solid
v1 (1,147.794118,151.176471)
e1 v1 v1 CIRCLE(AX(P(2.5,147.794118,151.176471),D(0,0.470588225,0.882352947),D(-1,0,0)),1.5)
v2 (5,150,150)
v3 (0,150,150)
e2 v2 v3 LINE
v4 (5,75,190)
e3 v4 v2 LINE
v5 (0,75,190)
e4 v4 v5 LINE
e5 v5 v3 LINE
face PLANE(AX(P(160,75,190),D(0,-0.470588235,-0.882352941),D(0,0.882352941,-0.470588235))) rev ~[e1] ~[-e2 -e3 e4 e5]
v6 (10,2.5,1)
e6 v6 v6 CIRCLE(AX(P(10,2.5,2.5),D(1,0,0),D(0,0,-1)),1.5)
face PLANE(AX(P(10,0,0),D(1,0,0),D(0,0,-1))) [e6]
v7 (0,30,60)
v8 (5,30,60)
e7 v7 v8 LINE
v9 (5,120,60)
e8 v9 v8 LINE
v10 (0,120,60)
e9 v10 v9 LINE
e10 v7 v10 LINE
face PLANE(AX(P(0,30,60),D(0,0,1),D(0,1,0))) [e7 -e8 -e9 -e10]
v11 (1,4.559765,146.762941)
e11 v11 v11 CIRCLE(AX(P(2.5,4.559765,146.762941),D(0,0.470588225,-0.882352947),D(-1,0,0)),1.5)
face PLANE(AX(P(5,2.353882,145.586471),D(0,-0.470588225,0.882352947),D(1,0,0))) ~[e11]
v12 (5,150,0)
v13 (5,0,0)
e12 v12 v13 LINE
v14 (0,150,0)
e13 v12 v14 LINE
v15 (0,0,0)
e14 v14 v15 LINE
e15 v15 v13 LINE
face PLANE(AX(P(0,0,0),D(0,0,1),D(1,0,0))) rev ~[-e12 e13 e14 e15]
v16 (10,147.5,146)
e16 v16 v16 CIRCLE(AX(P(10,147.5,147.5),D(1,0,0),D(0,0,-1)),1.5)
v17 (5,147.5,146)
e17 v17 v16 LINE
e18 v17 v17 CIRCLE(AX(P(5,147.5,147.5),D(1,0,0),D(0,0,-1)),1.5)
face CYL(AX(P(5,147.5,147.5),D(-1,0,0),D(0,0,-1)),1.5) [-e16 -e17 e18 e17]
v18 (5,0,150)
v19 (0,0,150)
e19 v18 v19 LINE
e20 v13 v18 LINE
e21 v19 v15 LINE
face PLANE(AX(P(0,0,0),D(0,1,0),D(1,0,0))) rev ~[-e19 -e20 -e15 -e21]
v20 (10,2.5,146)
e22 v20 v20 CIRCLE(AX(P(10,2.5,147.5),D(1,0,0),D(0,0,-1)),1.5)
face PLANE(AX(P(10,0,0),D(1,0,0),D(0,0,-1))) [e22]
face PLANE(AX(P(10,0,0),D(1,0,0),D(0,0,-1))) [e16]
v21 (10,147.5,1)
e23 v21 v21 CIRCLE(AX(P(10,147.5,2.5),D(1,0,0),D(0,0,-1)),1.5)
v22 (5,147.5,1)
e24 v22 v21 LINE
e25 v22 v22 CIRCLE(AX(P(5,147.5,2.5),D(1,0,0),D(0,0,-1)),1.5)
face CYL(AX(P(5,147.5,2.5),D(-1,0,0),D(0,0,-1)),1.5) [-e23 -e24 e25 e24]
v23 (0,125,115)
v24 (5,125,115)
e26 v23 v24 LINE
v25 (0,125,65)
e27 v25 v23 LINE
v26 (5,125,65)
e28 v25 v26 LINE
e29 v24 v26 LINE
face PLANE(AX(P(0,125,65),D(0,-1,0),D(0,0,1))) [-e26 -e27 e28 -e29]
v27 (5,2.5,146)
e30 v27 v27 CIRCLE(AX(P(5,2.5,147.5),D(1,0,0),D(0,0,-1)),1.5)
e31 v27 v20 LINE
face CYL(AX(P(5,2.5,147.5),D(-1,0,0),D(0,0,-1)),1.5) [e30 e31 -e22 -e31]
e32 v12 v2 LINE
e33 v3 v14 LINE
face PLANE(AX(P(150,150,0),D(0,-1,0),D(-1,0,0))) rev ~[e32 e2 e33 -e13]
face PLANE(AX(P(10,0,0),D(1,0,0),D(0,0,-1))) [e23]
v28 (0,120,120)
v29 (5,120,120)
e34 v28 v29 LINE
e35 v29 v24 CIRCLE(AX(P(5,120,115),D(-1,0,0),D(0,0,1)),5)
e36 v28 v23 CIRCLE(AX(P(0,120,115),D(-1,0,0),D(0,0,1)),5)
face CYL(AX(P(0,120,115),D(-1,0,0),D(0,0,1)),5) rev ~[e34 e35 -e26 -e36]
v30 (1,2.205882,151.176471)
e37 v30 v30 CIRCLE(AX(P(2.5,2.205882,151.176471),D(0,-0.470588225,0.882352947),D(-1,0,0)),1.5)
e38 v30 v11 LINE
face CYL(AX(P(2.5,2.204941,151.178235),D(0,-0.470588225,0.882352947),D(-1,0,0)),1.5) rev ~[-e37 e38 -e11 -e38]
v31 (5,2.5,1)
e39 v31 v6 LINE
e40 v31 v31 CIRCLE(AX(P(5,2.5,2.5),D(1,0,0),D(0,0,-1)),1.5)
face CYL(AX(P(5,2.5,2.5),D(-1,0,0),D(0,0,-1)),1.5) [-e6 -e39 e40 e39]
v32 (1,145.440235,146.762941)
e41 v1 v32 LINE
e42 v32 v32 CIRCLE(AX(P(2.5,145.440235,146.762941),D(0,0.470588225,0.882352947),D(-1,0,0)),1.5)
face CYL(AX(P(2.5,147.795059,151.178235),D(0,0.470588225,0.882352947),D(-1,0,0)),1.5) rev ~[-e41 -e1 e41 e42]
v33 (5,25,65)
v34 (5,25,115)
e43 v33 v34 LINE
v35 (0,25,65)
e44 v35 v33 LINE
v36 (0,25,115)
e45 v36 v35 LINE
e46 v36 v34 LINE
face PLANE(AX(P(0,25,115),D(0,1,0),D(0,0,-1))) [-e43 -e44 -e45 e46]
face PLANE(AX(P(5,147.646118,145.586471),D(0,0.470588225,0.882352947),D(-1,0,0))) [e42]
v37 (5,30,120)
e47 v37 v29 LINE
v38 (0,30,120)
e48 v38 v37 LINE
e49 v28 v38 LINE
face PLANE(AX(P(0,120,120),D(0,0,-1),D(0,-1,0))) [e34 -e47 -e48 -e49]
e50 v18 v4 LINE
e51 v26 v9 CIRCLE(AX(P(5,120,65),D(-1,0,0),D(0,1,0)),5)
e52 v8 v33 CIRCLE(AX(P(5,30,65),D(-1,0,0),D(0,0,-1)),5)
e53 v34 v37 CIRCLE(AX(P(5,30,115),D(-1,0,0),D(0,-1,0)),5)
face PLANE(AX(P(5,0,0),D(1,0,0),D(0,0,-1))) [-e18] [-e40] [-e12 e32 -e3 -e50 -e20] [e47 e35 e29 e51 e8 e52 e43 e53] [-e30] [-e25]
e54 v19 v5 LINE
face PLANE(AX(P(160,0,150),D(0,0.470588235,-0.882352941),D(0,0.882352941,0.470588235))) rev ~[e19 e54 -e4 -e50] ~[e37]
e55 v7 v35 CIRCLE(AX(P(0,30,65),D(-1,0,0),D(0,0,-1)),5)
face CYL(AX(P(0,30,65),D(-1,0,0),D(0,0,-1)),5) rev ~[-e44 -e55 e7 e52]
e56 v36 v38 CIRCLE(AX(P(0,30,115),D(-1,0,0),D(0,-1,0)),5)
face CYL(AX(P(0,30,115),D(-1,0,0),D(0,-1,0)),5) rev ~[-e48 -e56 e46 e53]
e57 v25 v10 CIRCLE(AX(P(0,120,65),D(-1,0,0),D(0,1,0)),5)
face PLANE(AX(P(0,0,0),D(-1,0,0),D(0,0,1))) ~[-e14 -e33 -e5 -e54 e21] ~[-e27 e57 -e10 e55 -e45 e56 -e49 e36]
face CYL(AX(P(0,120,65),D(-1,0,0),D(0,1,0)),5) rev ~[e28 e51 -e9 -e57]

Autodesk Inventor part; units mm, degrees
sketch "Boceto1" plane through (0, 0, 0) normal (0, 0, 1) x (1, 0, 0)
  line L0 (0, 0) -> (150, 0)
  line L1 (150, 0) -> (150, 150)
  line L2 (150, 150) -> (0, 150)
  line L3 (0, 150) -> (0, 0)
  line L4 (5, 145) -> (145, 145)
  line L5 (145, 145) -> (145, 5)
  line L6 (145, 5) -> (5, 5)
  line L7 (5, 5) -> (5, 145)
  dimension "d0" = 150
  dimension "d1" = 150
  dimension "d2" = 5
extrude "Extrusión1" add sketch "Boceto1" along normal blind 150
sketch "Boceto2" plane through (150, 0, 0) normal (1, 0, 0) x (0, 0, -1)
  line L0 (-150, 0) -> (-150, 150) projected
  line L1 (-150, 75) -> (-190, 75) construction
  line L2 (-190, 75) -> (-150, 150)
  line L3 (0, 0) -> (-150, 0) construction
  line L4 (-150, 0) -> (-190, 75)
  dimension "d5" = 40
extrude "Extrusión2" add sketch "Boceto2" against normal blind 5
ref_plane "Plano de trabajo1" through (75, 0, 0) normal (1, 0, 0) x (0, 0, -1)
mirror "Simetría1" about plane through (75, 0, 0) normal (1, 0, 0) of "Extrusión2"
sketch "Boceto3" plane through (0, 150, 0) normal (0, 1, 0) x (1, 0, 0)
  line L0 (105, -60) -> (45, -60)
  line L1 (45, -60) -> (45, -95)
  line L2 (60, -110) -> (90, -110)
  line L3 (105, -95) -> (105, -60)
  line L4 (150, 0) -> (0, 0) projected
  line L5 (145, -150) -> (5, -150) projected
  arc A0 (90, -110) -> (105, -95) centre (90, -95) ccw
  arc A1 (45, -95) -> (60, -110) centre (60, -95) ccw
  point P0 (45, -110)
  point P1 (105, -110)
  point P2 (75, -60)
  point P3 (75, 0)
  dimension "d8" = 60
  dimension "d9" = 50
  dimension "d10" = 40
  dimension "d11" = 15
extrude "Extrusión3" cut sketch "Boceto3" against normal through all
sketch "Boceto4" plane through (150, 0, 0) normal (1, 0, 0) x (0, 0, -1)
  line L0 (-13, 20) -> (-123, 20)
  line L1 (-128, 25) -> (-128, 75)
  line L2 (-123, 80) -> (-13, 80)
  line L3 (-8, 75) -> (-8, 25)
  line L4 (0, 0) -> (0, 150) projected
  line L5 (0, 0) -> (-150, 0) projected
  arc A0 (-123, 80) -> (-128, 75) centre (-123, 75) ccw
  arc A1 (-8, 75) -> (-13, 80) centre (-13, 75) ccw
  arc A2 (-13, 20) -> (-8, 25) centre (-13, 25) ccw
  arc A3 (-128, 25) -> (-123, 20) centre (-123, 25) ccw
  point P0 (-128, 80)
  point P1 (-128, 20)
  point P2 (-8, 80)
  dimension "d14" = 120
  dimension "d15" = 60
  dimension "d16" = 8
  dimension "d17" = 20
  dimension "d18" = 5
extrude "Extrusión4" cut sketch "Boceto4" against normal up to surface (5 mm away)
sketch "Boceto5" plane through (0, 0, 0) normal (-1, 0, 0) x (0, 0, 1)
  line L0 (65, 125) -> (115, 125)
  line L1 (120, 120) -> (120, 30)
  line L2 (115, 25) -> (65, 25)
  line L3 (60, 30) -> (60, 120)
  line L4 (0, 150) -> (0, 0) projected
  arc A0 (120, 120) -> (115, 125) centre (115, 120) ccw
  arc A1 (115, 25) -> (120, 30) centre (115, 30) ccw
  arc A2 (65, 125) -> (60, 120) centre (65, 120) ccw
  arc A3 (60, 30) -> (65, 25) centre (65, 30) ccw
  point P0 (60, 150)
  point P1 (120, 25)
  point P2 (120, 125)
  point P3 (60, 25)
  point P4 (60, 75)
  point P5 (0, 75)
  dimension "d21" = 60
  dimension "d22" = 100
  dimension "d23" = 60
  dimension "d24" = 5
extrude "Extrusión5" cut sketch "Boceto5" against normal blind 10
sketch "Boceto6" plane through (150, 0, 0) normal (1, 0, 0) x (0, 0, -1)
  line L0 (-190, 75) -> (-150, 0) projected
  line L1 (-150, 150) -> (-190, 75) projected
  line L2 (-154.4118, 152.3529) -> (-195.6667, 75)
  line L3 (-195.6667, 75) -> (-154.4118, -2.3529)
  line L4 (-154.4118, 152.3529) -> (-144.4118, 152.3529)
  line L5 (-144.4118, 152.3529) -> (-144.4118, 150)
  line L6 (-154.4118, -2.3529) -> (-144.4118, -2.3529)
  line L7 (-144.4118, -2.3529) -> (-144.4118, 0)
  line L8 (0, 0) -> (-150, 0) projected
  line L9 (0, 150) -> (-150, 150) projected
  dimension "d27" = 5
  dimension "d28" = 10
extrude "Extrusión6" add sketch "Boceto6" along normal blind 10 and the other way blind 160
fillet "Empalme1" radius 5 3 edges at (75, 152.3529, 154.4118) (75, 75, 195.6667) (75, -2.3529, 154.4118)
sketch "Boceto7" plane through (150, 25, 8) normal (0, 0, 1) x (1, 0, 0)
  circle A0 centre (-2.5, 2.5) radius 1.25
  line L0 (0, 50) -> (0, 0) projected
  line L1 (0, 0) -> (-5, 0) projected
  point P0 (-150, -25)
  point P1 (-2.5, 0)
  dimension "d34" = 2.5
  dimension "d35" = 2.5
  dimension "d36" = 2.5
extrude "Extrusión7" cut sketch "Boceto7" against normal blind 3
ref_plane "Plano de trabajo2" through (150, 25, 68) normal (0, 0, 1) x (1, 0, 0)
mirror "Simetría2" about plane through (150, 25, 68) normal (0, 0, 1) of "Extrusión7"
sketch "Boceto8" plane through (160, 0, 0) normal (1, 0, 0) x (0, 0, -1)
  arc A0 (-155.8235, 0.2941) -> (-151.4118, -2.3529) centre (-151.4118, 2.6471) ccw projected
  line L0 (-151.4118, -2.3529) -> (-144.4118, -2.3529) projected
  line L1 (-144.4118, -2.3529) -> (-144.4118, 0) projected
  line L2 (-144.4118, 0) -> (-150, 0) projected
  line L3 (-150, 0) -> (-190, 75) projected
  line L4 (-190, 75) -> (-150, 150) projected
  line L5 (-150, 150) -> (-144.4118, 150) projected
  line L6 (-144.4118, 150) -> (-144.4118, 152.3529) projected
  line L7 (-144.4118, 152.3529) -> (-151.4118, 152.3529) projected
  arc A1 (-151.4118, 152.3529) -> (-155.8235, 149.7059) centre (-151.4118, 147.3529) ccw projected
  line L8 (-155.8235, 149.7059) -> (-194.4118, 77.3529) projected
  arc A2 (-194.4118, 77.3529) -> (-194.4118, 72.6471) centre (-190, 75) ccw projected
  line L9 (-194.4118, 72.6471) -> (-155.8235, 0.2941) projected
  point P0 (0, 0)
extrude "Extrusión8" cut sketch "Boceto8" against normal through all
sketch "Boceto9" plane through (145, 0, 150) normal (0, -0.4705882, 0.8823529) x (1, 0, 0)
  circle A0 centre (2.5, 2.5) radius 1.5
  line L0 (5, 85) -> (5, 0) projected
  line L1 (5, 0) -> (0, 0) projected
  point P0 (-145, -70.5882)
  dimension "d41" = 3
  dimension "d42" = 2.5
  dimension "d43" = 2.5
extrude "Extrusión9" cut sketch "Boceto9" against normal blind 5
ref_plane "Plano de trabajo3" through (75, 0, 0) normal (1, 0, 0) x (0, 0, -1)
ref_plane "Plano de trabajo4" through (0, 75, 0) normal (0, -1, 0) x (1, 0, 0)
mirror "Simetría3" about plane through (75, 0, 0) normal (1, 0, 0) of "Extrusión9"
mirror "Simetría4" about plane through (0, 75, 0) normal (0, -1, 0) of "Extrusión8", "Extrusión9", "Simetría3"
sketch "Boceto10" plane through (150, 0, 0) normal (1, 0, 0) x (0, 0, -1)
  arc A0 (-13, 20) -> (-8, 25) centre (-13, 25) ccw projected
  line L0 (-13, 20) -> (-123, 20) projected
  arc A1 (-128, 25) -> (-123, 20) centre (-123, 25) ccw projected
  line L1 (-128, 25) -> (-128, 75) projected
  arc A2 (-123, 80) -> (-128, 75) centre (-123, 75) ccw projected
  line L2 (-123, 80) -> (-13, 80) projected
  arc A3 (-8, 75) -> (-13, 80) centre (-13, 75) ccw projected
  line L3 (-8, 75) -> (-8, 25) projected
  line L4 (0, 0) -> (0, 150) projected
  line L5 (0, 150) -> (-150, 150) projected
  line L6 (-150, 150) -> (-190, 75) projected
  line L7 (-190, 75) -> (-150, 0) projected
  line L8 (0, 0) -> (-150, 0) projected
  point P0 (0, 0)
extrude "Extrusión10" cut sketch "Boceto10" against normal up to surface (145 mm away) contours L0 A1 L1 A2 L2 A3 L3 A0 | L8 L7 L6 L5 L4
sketch "Boceto11" plane through (5, 0, 0) normal (1, 0, 0) x (0, 0, -1)
  circle A0 centre (-147.5, 2.5) radius 1.5
  line L0 (0, 0) -> (-150, 0) projected
  line L1 (-190, 75) -> (-150, 0) construction
  line L2 (-190, 75) -> (75.3721, 75) construction
  line L3 (-75, 153.8029) -> (-75, -92.275) construction
  circle A1 centre (-147.5, 147.5) radius 1.5
  circle A2 centre (-2.5, 2.5) radius 1.5
  circle A3 centre (-2.5, 147.5) radius 1.5
  dimension "d48" = 3
  dimension "d49" = 2.5
  dimension "d50" = 2.5
extrude "Extrusión11" add sketch "Boceto11" along normal blind 5
properties part number "CasaJugueteAPM" material "Plástico ABS"
